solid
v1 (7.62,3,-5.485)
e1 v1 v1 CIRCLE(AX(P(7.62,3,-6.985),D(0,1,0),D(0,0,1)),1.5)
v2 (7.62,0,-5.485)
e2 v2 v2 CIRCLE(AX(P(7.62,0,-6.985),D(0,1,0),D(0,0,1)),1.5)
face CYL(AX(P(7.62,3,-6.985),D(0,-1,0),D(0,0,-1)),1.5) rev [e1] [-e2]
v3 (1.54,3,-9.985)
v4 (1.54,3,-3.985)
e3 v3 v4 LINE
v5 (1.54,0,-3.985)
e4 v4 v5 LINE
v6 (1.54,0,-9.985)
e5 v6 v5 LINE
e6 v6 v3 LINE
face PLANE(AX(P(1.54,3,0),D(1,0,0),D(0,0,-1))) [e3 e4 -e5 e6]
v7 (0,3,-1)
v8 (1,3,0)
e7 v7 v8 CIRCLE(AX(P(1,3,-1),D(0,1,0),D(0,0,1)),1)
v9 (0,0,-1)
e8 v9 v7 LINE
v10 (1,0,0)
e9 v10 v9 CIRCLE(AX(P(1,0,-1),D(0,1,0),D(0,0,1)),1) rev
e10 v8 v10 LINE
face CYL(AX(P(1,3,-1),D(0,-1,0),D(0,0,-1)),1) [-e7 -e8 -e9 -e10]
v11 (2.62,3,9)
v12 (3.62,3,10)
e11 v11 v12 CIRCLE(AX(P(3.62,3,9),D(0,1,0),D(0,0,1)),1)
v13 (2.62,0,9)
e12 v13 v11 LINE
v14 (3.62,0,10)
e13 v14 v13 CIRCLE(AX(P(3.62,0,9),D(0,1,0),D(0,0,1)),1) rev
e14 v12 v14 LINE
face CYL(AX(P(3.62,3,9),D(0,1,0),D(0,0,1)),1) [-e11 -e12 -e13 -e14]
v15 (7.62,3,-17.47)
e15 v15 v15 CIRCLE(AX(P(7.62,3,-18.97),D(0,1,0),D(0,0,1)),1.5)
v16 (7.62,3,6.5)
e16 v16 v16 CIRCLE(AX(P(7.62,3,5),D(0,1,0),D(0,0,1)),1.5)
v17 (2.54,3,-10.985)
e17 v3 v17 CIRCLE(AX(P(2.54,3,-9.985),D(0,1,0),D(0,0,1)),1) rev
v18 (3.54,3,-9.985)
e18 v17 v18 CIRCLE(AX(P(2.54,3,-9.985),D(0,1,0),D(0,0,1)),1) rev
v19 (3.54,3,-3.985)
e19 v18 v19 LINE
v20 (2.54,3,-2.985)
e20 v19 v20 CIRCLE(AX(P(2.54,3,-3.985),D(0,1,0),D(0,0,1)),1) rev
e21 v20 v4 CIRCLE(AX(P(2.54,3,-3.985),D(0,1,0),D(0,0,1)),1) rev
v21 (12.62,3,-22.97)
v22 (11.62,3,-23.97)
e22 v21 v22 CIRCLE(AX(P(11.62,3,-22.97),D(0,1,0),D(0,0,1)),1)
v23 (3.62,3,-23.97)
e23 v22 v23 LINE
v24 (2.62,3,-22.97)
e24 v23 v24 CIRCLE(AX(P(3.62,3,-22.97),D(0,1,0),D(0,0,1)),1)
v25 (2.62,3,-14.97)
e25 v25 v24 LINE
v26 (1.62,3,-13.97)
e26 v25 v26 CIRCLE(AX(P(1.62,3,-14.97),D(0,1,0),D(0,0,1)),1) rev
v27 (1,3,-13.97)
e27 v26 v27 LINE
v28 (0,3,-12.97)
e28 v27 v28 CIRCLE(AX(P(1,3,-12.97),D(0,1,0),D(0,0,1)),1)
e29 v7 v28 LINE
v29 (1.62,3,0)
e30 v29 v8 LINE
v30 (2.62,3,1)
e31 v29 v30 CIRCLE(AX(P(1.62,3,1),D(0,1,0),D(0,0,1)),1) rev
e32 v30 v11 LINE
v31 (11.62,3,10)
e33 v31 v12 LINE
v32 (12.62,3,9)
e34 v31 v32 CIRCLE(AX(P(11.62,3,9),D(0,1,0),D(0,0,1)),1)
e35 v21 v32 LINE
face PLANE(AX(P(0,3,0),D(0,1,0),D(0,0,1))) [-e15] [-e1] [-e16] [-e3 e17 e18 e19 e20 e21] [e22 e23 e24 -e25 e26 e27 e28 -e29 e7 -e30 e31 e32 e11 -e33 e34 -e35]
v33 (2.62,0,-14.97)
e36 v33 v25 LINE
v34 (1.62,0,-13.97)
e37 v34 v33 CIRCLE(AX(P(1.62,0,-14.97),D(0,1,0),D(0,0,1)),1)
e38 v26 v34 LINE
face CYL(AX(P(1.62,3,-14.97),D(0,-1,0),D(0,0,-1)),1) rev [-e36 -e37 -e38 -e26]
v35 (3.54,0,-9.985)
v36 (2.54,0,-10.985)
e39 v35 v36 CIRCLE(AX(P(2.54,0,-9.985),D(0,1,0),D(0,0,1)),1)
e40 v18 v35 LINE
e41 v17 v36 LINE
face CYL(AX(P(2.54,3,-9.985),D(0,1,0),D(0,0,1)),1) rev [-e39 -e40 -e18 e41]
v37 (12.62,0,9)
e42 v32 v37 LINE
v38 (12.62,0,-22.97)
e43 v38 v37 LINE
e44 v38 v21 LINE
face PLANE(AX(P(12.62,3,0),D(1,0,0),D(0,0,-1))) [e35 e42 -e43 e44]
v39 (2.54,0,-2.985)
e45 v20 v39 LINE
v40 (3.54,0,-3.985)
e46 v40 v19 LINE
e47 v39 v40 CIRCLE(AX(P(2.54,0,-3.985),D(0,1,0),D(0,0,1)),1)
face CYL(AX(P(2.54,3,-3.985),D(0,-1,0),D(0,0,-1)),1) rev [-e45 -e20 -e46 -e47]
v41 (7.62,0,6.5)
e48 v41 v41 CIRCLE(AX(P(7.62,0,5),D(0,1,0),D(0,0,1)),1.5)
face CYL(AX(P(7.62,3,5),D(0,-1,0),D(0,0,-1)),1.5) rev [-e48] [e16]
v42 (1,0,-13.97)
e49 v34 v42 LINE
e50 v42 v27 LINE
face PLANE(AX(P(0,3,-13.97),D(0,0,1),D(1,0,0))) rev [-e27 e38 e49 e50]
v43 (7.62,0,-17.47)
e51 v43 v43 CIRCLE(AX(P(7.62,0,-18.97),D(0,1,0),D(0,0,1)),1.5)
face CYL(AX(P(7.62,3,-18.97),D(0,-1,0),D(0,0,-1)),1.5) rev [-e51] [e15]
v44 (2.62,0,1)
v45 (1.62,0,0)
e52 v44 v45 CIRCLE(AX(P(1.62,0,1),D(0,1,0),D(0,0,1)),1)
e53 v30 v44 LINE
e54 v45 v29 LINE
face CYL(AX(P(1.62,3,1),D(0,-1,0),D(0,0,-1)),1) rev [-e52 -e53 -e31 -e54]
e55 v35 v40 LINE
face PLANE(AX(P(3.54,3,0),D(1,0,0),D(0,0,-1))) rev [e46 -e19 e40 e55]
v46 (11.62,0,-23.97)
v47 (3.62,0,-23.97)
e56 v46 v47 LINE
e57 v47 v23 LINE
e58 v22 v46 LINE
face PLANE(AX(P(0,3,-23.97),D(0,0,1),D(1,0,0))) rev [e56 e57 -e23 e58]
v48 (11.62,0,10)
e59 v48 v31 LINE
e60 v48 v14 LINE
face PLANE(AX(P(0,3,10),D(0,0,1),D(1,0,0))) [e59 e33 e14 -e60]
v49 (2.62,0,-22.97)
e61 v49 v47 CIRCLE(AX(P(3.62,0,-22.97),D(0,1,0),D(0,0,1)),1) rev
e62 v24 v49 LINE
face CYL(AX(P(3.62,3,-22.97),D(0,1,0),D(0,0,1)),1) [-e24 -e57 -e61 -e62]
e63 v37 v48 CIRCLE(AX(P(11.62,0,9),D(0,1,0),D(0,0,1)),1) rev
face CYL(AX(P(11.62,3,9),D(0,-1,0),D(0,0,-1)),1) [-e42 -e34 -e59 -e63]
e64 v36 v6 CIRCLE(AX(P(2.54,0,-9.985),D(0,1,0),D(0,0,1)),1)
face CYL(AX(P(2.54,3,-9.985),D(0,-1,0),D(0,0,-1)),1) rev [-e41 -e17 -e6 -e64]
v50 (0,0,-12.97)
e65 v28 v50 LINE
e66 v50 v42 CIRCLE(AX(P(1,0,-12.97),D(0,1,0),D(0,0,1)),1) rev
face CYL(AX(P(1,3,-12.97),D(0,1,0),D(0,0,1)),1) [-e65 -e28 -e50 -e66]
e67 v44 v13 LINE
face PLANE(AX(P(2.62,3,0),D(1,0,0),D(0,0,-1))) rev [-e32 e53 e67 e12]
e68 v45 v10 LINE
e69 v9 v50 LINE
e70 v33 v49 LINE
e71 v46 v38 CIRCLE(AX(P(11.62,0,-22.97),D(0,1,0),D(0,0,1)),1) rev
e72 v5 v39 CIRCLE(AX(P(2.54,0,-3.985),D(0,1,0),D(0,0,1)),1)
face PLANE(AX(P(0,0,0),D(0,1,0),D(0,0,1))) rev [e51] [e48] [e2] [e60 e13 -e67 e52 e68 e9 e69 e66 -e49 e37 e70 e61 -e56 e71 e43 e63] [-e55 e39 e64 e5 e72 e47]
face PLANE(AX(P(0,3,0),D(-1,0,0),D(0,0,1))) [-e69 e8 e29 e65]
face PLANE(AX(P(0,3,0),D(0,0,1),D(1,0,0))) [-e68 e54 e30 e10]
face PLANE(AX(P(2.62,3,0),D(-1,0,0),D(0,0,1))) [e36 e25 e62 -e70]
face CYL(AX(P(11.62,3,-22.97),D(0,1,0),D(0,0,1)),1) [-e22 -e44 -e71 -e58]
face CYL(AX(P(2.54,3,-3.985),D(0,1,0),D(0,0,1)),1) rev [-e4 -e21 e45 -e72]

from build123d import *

# Parameters (mm, degrees)
SKETCH2_W           = 10
SKETCH2_H           = 10
SKETCH2_R           = 1.5
SKETCH2_W_2         = 12.62
SKETCH2_H_2         = 13.97
SKETCH2_W_3         = 2
SKETCH2_H_3         = 8
BOSS_EXTRUDE1_DEPTH = 3
FILLET2_R           = 1
FILLET3_R           = 1


with BuildPart() as part:
    # Sketch2 → Boss-Extrude1 (new body)
    # profile 1 of 3: a face of its own
    with BuildSketch(Plane(origin=(0, 0, 0), x_dir=(1, 0, 0), z_dir=(0, 1, 0))):
        with Locations((7.62, -5)):
            Rectangle(SKETCH2_W, SKETCH2_H)
        with Locations(Location((7.62, -5, 0), (0, 0, 270))):
            Circle(SKETCH2_R, mode=Mode.SUBTRACT)
    # profile 2 of 3: a face of its own
    with BuildSketch(Plane(origin=(0, 0, 0), x_dir=(1, 0, 0), z_dir=(0, 1, 0))):
        with Locations((6.31, 6.985)):
            Rectangle(SKETCH2_W_2, SKETCH2_H_2)
        with Locations(Location((7.62, 6.985, 0), (0, 0, 270))):
            Circle(SKETCH2_R, mode=Mode.SUBTRACT)
        with Locations((2.54, 6.985)):
            Rectangle(SKETCH2_W_3, SKETCH2_H_3, mode=Mode.SUBTRACT)
    # profile 3 of 3: a face of its own
    with BuildSketch(Plane(origin=(0, 0, 0), x_dir=(1, 0, 0), z_dir=(0, 1, 0))):
        with Locations((7.62, 18.97)):
            Rectangle(SKETCH2_W, SKETCH2_H)
        with Locations(Location((7.62, 18.97, 0), (0, 0, 270))):
            Circle(SKETCH2_R, mode=Mode.SUBTRACT)
    extrude(amount=BOSS_EXTRUDE1_DEPTH)

    # Fillet2
    fillet2_edges = [part.edges().sort_by_distance(p)[0] for p in [
        (1.54, 1.5, -2.985),
        (3.54, 1.5, -2.985),
        (3.54, 1.5, -10.985),
        (1.54, 1.5, -10.985),
    ]]
    fillet(fillet2_edges, radius=FILLET2_R - 0.0001)  # a hair under: the kernel refuses the full size

    # Fillet3
    fillet3_edges = [part.edges().sort_by_distance(p)[0] for p in [
        (12.62, 1.5, 10),
        (2.62, 1.5, 10),
        (2.62, 1.5, 0),
        (0, 1.5, 0),
        (0, 1.5, -13.97),
        (2.62, 1.5, -13.97),
        (2.62, 1.5, -23.97),
        (12.62, 1.5, -23.97),
    ]]
    fillet(fillet3_edges, radius=FILLET3_R)


solid = part.part
